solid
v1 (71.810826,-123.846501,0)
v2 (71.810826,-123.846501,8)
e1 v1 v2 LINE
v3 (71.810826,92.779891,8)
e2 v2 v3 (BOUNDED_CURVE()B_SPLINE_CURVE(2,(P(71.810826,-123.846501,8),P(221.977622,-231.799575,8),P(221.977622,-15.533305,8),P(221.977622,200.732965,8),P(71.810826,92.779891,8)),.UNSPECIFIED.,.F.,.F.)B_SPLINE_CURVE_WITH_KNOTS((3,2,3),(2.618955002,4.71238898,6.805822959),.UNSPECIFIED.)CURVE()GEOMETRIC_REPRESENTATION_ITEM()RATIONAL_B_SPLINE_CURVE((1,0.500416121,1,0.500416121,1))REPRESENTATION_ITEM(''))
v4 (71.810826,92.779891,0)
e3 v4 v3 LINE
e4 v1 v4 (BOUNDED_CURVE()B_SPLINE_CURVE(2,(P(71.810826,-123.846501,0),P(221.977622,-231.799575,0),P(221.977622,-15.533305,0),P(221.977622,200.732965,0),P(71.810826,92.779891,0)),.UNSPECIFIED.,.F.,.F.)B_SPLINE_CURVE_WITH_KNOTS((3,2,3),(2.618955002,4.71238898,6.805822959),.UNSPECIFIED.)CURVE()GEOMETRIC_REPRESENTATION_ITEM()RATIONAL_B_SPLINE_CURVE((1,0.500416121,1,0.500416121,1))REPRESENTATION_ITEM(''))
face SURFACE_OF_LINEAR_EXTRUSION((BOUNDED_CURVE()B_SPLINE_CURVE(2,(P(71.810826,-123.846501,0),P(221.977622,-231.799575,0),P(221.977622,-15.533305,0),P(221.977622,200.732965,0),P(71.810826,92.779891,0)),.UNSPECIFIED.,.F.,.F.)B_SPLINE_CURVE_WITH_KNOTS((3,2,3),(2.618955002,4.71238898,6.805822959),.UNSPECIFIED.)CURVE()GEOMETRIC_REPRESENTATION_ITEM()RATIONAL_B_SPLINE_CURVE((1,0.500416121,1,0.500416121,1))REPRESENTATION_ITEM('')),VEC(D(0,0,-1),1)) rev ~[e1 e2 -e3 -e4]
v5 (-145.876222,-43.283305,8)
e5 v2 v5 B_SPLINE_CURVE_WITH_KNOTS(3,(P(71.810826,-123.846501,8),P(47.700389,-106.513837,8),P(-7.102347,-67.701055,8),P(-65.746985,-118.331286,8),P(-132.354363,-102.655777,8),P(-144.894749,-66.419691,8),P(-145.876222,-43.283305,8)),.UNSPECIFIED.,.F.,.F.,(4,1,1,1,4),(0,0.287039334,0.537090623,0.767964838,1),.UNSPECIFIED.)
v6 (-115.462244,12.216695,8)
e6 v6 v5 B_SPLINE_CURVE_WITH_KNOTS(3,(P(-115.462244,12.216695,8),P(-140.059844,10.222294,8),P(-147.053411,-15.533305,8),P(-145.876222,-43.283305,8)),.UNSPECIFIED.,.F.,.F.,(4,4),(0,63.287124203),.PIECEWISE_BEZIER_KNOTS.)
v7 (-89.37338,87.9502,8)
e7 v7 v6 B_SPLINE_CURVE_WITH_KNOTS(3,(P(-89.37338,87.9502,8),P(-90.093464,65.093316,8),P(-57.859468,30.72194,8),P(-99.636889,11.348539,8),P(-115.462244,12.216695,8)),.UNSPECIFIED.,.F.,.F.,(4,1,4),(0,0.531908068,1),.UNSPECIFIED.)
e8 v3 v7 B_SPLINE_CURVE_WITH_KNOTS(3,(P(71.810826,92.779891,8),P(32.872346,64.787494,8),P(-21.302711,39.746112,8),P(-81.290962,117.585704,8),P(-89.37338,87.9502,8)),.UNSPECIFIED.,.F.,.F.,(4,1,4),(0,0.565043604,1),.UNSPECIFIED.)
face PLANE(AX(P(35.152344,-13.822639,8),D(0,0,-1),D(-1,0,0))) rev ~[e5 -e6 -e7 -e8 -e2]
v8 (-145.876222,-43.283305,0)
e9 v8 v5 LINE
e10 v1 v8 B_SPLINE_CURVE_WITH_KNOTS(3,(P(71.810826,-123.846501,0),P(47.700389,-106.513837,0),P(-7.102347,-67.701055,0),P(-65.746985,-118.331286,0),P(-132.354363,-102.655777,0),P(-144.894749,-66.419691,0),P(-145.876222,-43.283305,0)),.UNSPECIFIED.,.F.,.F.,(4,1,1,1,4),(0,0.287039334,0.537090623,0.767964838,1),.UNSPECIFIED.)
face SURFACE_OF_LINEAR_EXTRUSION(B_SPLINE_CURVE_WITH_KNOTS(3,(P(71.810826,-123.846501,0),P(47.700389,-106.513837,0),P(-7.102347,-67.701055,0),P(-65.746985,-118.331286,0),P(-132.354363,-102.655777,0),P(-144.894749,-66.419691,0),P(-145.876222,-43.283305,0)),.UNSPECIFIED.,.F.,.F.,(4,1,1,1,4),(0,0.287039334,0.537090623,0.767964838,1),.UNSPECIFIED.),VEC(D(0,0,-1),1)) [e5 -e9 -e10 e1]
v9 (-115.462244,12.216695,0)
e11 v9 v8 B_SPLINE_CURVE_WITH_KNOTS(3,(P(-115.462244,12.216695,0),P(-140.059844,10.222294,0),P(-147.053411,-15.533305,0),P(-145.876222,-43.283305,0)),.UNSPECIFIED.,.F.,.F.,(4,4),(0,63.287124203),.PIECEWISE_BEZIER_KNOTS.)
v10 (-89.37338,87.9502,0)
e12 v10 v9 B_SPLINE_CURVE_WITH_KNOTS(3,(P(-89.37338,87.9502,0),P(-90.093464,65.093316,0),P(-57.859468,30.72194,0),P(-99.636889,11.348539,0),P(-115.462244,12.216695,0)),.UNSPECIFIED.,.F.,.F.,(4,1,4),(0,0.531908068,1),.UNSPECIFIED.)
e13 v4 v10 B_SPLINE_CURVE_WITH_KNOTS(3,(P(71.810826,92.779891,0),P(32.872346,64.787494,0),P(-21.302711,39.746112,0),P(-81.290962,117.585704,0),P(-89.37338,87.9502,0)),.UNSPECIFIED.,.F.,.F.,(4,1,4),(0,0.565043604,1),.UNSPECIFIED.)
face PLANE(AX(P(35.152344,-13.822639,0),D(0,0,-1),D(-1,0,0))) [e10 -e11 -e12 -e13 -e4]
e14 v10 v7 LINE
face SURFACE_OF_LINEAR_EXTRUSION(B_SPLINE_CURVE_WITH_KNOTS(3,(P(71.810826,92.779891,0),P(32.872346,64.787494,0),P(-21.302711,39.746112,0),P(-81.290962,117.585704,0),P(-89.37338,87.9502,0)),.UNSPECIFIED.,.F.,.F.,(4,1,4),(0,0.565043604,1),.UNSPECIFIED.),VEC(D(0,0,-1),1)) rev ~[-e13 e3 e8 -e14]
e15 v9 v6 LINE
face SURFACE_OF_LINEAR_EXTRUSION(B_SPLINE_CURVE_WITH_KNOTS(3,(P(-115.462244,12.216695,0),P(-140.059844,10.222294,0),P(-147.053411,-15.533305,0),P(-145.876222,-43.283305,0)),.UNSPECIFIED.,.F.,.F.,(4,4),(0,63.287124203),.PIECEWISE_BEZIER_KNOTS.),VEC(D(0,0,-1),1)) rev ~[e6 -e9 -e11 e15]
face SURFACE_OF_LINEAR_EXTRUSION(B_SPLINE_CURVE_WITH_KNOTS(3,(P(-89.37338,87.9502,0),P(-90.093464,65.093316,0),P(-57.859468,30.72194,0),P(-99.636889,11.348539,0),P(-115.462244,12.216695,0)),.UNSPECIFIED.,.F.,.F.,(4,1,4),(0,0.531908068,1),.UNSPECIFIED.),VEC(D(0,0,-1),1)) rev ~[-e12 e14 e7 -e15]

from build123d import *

# Parameters (mm, degrees)
F1_DEPTH = 8


with BuildPart() as f1:
    # F0 (on Top) → F1 (new body)
    with BuildSketch(Plane.XY):
        with BuildLine():
            add(Edge.make_bspline(
                [(71.8108263604, -123.8465007597), (47.7003894889, -106.5138372126), (-7.1023466925, -67.7010548051), (-65.7469849132, -118.3312863438), (-132.354363187, -102.6557773389), (-144.8947489305, -66.4196911039), (-145.8762223824, -43.2833050614)],
                knots=[0, 0, 0, 0, 0.2870393338, 0.537090623, 0.7679648384, 1, 1, 1, 1], degree=3))
            add(Edge.make_bspline(
                [(71.8108263604, -123.8465007597), (221.9776217834, -231.7995748847), (221.9776217834, -15.5333050614), (221.9776217834, 200.732964762), (71.8108263604, 92.7798906369)],
                knots=[2.6189550017, 2.6189550017, 2.6189550017, 4.7123889804, 4.7123889804, 6.805822959, 6.805822959, 6.805822959], degree=2, weights=[1, 0.500416121, 1, 0.500416121, 1]))
            add(Edge.make_bspline(
                [(71.8108263604, 92.7798906369), (32.8723456502, 64.787494425), (-21.3027110814, 39.7461116108), (-81.2909620858, 117.5857035406), (-89.3733802445, 87.9502004857)],
                knots=[0, 0, 0, 0, 0.5650436037, 1, 1, 1, 1], degree=3))
            add(Edge.make_bspline(
                [(-89.3733802445, 87.9502004857), (-90.0934642677, 65.0933156509), (-57.859468156, 30.7219399995), (-99.6368888097, 11.3485391097), (-115.4622438558, 12.2166949386)],
                knots=[0, 0, 0, 0, 0.5319080677, 1, 1, 1, 1], degree=3))
            add(Edge.make_bspline(
                [(-115.4622438558, 12.2166949386), (-140.0598439582, 10.2222937221), (-147.0534109131, -15.5333050614), (-145.8762223824, -43.2833050614)],
                knots=[0, 0, 0, 0, 63.2871242025, 63.2871242025, 63.2871242025, 63.2871242025], degree=3))
        make_face()
        with BuildLine():
            add(Edge.make_bspline(
                [(-81.4262804577, 86.6857544237), (-81.4396250825, 86.2899525598), (-81.470808458, 84.4412359429), (-81.2371444329, 80.3732443352), (-79.8996394846, 74.5622458053), (-77.7739796116, 68.1004270996), (-75.1889101521, 61.6875748493), (-72.6363769897, 55.6379909817), (-70.5528201855, 50.214885946), (-69.2861786808, 45.7296293686), (-68.4936431345, 42.0817923462), (-68.1698884875, 39.0929607397), (-68.1533657536, 36.6406286998), (-68.2570236145, 34.6616403838), (-68.4737574041, 33.0838263382), (-68.7291671623, 31.8176398216), (-68.9833432916, 30.7603115144), (-69.2894446793, 29.7143907955), (-69.7010474162, 28.4802252803), (-70.3057430461, 26.9847588782), (-71.2217272744, 25.180071771), (-72.5057098447, 22.996441344), (-74.3801649871, 20.4643430051), (-77.1315209855, 17.5971889856), (-80.926011463, 14.2754710831), (-86.2805957531, 10.7907129486), (-92.9455256658, 7.7447804381), (-100.4062506896, 5.4313702506), (-107.2615908321, 4.1555616419), (-112.3230611682, 4.0215517798), (-114.7617028131, 4.1430335828), (-115.474366372, 4.1953856873)],
                knots=[1.0136586156, 1.0136586156, 1.0136586156, 1.0136586156, 2.2016566853, 6.5591151943, 13.1979354067, 20.0157728224, 26.9584341349, 33.9306395999, 39.7192874549, 44.3702545919, 47.8991910145, 50.9066466506, 53.369227998, 55.2496065506, 56.847005284, 58.1419089398, 59.1235009163, 60.1084144557, 61.4103265818, 63.0253022922, 64.9424016715, 67.4766146145, 70.6177002822, 74.3676557464, 79.3769786716, 85.7174213089, 93.458168517, 101.2822181349, 109.1089736004, 114.2877981192, 116.4315649936, 116.4315649936, 116.4315649936, 116.4315649936], degree=3))
            add(Edge.make_bspline(
                [(72.8103885596, 83.6341241639), (71.1240314332, 82.4184487748), (65.3211296449, 78.2511465746), (54.3822197437, 70.6703789871), (40.5843185437, 63.3369671226), (27.1044447549, 57.4124251533), (15.6068408566, 53.964757392), (5.3548644478, 52.6151050201), (-2.8177310259, 52.7103819348), (-9.6197612713, 53.363557714), (-15.7305931996, 54.5996218363), (-21.4732164128, 56.31783797), (-26.4693776174, 58.366991406), (-30.2671336771, 60.2223905595), (-33.0718752326, 61.7320886712), (-35.2053892899, 62.9792168629), (-37.3369452365, 64.2673631998), (-39.7615979324, 65.8275673276), (-42.7778265582, 67.9000785118), (-46.5332653234, 70.5849117526), (-51.0723794993, 74.0383260586), (-56.0224963865, 77.9290754702), (-61.0223620617, 81.8442891195), (-65.7064727807, 85.3502794992), (-69.7594173643, 88.139955985), (-72.9865417062, 89.9814861225), (-75.2118467434, 90.9665662194), (-76.6921868128, 91.4830508838), (-77.6909621365, 91.7169743843), (-78.3366022017, 91.7578979554), (-78.6767300882, 91.7470455298), (-78.7973913091, 91.6896137336), (-78.92482237, 91.6464959623), (-79.1937851984, 91.3963059685), (-79.6818827943, 90.8264140362), (-80.3159105632, 89.7215409417), (-80.9369473577, 88.2993059967), (-81.2772034526, 87.2085598356), (-81.4244737614, 86.692097536), (-81.4262804577, 86.6857544237)],
                knots=[4.5292135135, 4.5292135135, 4.5292135135, 4.5292135135, 10.7658667308, 25.9500108525, 44.4238690912, 57.5330245622, 70.0845168555, 80.2898579631, 88.4222588801, 94.5557392843, 100.7652771107, 107.0947805516, 112.5088206902, 116.9457400715, 119.7701488038, 122.0625237383, 124.3588459686, 127.2414612751, 130.7107153436, 135.3368293125, 141.0894801607, 147.8190536406, 154.2256313175, 160.1398760262, 165.3706560057, 168.9759235223, 171.2693919986, 172.6578901032, 173.6814113013, 174.3231622883, 174.6136969662, 174.6729508701, 174.7225491593, 175.0159838788, 175.7405361192, 176.9913533667, 178.804034025, 180.3944536329, 180.4142282457, 180.4142282457, 180.4142282457, 180.4142282457], degree=3))
            add(Edge.make_bspline(
                [(72.8103885596, 83.6341241639), (72.7317618823, 83.5699644288), (70.9554937476, 82.1155753179), (67.9804833382, 79.4874285922), (64.1756082657, 75.8169878196), (61.2913248025, 72.7059934358), (59.0477069928, 70.0999739159), (57.2057633336, 67.8641883266), (55.4110672881, 65.56108087), (53.3041635287, 62.7354150513), (50.7805389552, 59.0881516023), (47.799656336, 54.2715974255), (44.2346711733, 47.9787195772), (40.2649118491, 39.7160179142), (36.5713092348, 29.8478370438), (33.5979528322, 19.5919068023), (31.7307948184, 10.2422116085), (30.6840668384, 2.616404127), (30.0568619889, -3.4886245577), (29.7723767309, -8.3519176651), (29.6597520537, -12.2635801323), (29.6233030189, -15.5333050614), (29.6597520537, -18.8030299904), (29.7723767309, -22.7146924576), (30.0568619889, -27.577985565), (30.6840668384, -33.6830142497), (31.7307948184, -41.3088217312), (33.5979528322, -50.658516925), (36.5713092348, -60.9144471666), (40.2649118491, -70.7826280369), (44.2346711733, -79.0453296999), (47.799656336, -85.3382075482), (50.7805389552, -90.154761725), (53.3041635287, -93.802025174), (55.4110672881, -96.6276909927), (57.2057633336, -98.9307984493), (59.0477069928, -101.1665840385), (61.2913248025, -103.7726035588), (64.1756082657, -106.8835979408), (67.9804833382, -110.5540387225), (71.0158561736, -113.2355100421), (72.8564442573, -114.7385263129), (72.9977731483, -114.8532271387)],
                knots=[55.4205486123, 55.4205486123, 55.4205486123, 55.4205486123, 55.7249011544, 62.305727762, 67.3238088056, 71.5787205888, 75.0272954709, 77.639141403, 80.2683237903, 83.7858930003, 88.2122067644, 93.5690542346, 100.7734603115, 109.9018351329, 121.0375002369, 132.3448319226, 141.8998601689, 149.6118137579, 155.4302714584, 160.3068693677, 164.2227012809, 167.1693695094, 170.1160377378, 174.0318696511, 178.9084675603, 184.7269252608, 192.4388788498, 201.9939070962, 213.3012387819, 224.4369038858, 233.5652787073, 240.7696847841, 246.1265322543, 250.5528460185, 254.0704152284, 256.6995976157, 259.3114435479, 262.76001843, 267.0149302132, 272.0330112567, 278.6138378644, 279.1597054143, 279.1597054143, 279.1597054143, 279.1597054143], degree=3))
            add(Edge.make_bspline(
                [(72.9977731483, -114.8532271387), (72.4056865049, -114.4263580428), (69.0464376439, -111.9992044047), (61.9105909681, -106.8036530478), (52.1940425374, -100.414675291), (42.2398177459, -94.2326232769), (33.0541391905, -89.1692992659), (24.2243642947, -84.9672989241), (16.2683766941, -82.0032951161), (9.8318873834, -80.2250290854), (4.463169856, -79.0636225581), (-0.1263073791, -78.4111921814), (-4.1937519975, -78.1649162686), (-7.7060356334, -78.20526396), (-11.1805991563, -78.3727848605), (-15.105690951, -78.8390498977), (-19.429069468, -79.71105596), (-23.8718019577, -80.9066029792), (-28.6468717479, -82.5067792162), (-34.2116599911, -84.6249302975), (-40.8658871469, -87.6398905134), (-47.690965404, -91.0045722285), (-53.9322172369, -94.031755035), (-58.8517886529, -96.1862154004), (-62.8636912858, -97.8099974599), (-66.2287548358, -99.0112055596), (-69.174479199, -99.8882996602), (-71.7101157046, -100.5041409348), (-74.2391141536, -101.045908585), (-77.1889902033, -101.5211815466), (-80.5636006609, -101.8380782168), (-84.1498166568, -101.9648655282), (-88.1283425241, -101.8479910003), (-92.8713789939, -101.4573804411), (-98.6786686768, -100.4434986326), (-104.6143126843, -98.6675537845), (-109.8122869472, -96.3889800651), (-113.6612373405, -94.2262164294), (-116.6721363111, -92.2928397642), (-119.445929644, -90.1897015323), (-122.5417365002, -87.5069010735), (-126.0053703089, -83.7372187502), (-129.3000799141, -78.8269050802), (-132.2206720517, -72.9997696435), (-134.760402105, -65.6917432119), (-136.8528161109, -57.6024378465), (-137.649866694, -49.6245863229), (-137.8414579174, -44.9060106494), (-137.8834109174, -42.9442403412)],
                knots=[4.2858061399, 4.2858061399, 4.2858061399, 4.2858061399, 6.4754935696, 16.7181495974, 30.7634466026, 41.3498570357, 51.8646712584, 62.2141493558, 70.6575747754, 77.2977144197, 82.2304258348, 87.1280777725, 91.1888826436, 94.4417008039, 97.6615312024, 101.6210664508, 106.2864985952, 110.880412158, 115.4145221345, 121.3894131446, 128.7352744437, 137.3194350468, 144.219174491, 149.5422059689, 153.4280250406, 157.2015215054, 160.2566826573, 162.6437031168, 165.0279610064, 168.0144585226, 171.6015387383, 175.1893400883, 178.772742133, 183.5366693447, 189.4556710281, 196.4255332119, 202.067982696, 206.4456583082, 209.6586104968, 212.7949457303, 216.8805616296, 221.934808933, 228.1024059287, 234.5573044306, 241.4332004742, 251.2825478576, 259.5402388761, 265.4359196068, 265.4359196068, 265.4359196068, 265.4359196068], degree=3))
            add(Edge.make_bspline(
                [(-115.474366372, 4.1953856873), (-115.654699102, 4.1804409153), (-116.5836359717, 4.0950636678), (-118.5079216061, 3.8241612148), (-121.094735833, 3.0439396902), (-123.6838235375, 1.8597581111), (-125.9853889989, 0.3481336416), (-128.0619952594, -1.4951736511), (-129.9535460087, -3.6932073495), (-131.8514714309, -6.5803447016), (-133.9637161202, -10.6180046655), (-136.0486166412, -16.5975276115), (-137.4710871628, -24.3656867863), (-138.1549681717, -32.3234699475), (-138.079170547, -38.6118374717), (-137.939859331, -41.8534729549), (-137.8834109174, -42.9442403412)],
                knots=[0.6605528161, 0.6605528161, 0.6605528161, 0.6605528161, 1.2032828879, 3.4574616871, 6.4791602651, 9.2718264149, 11.9726703823, 14.7076610425, 17.5762809491, 20.6455316793, 25.0544251668, 31.2157003257, 39.5600454386, 48.6812593878, 55.1351477368, 58.4131045259, 58.4131045259, 58.4131045259, 58.4131045259], degree=3))
        make_face(mode=Mode.SUBTRACT)
        with BuildLine():
            add(Edge.make_bspline(
                [(72.8103885596, 83.6341241639), (71.1240314332, 82.4184487748), (65.3211296449, 78.2511465746), (54.3822197437, 70.6703789871), (40.5843185437, 63.3369671226), (27.1044447549, 57.4124251533), (15.6068408566, 53.964757392), (5.3548644478, 52.6151050201), (-2.8177310259, 52.7103819348), (-9.6197612713, 53.363557714), (-15.7305931996, 54.5996218363), (-21.4732164128, 56.31783797), (-26.4693776174, 58.366991406), (-30.2671336771, 60.2223905595), (-33.0718752326, 61.7320886712), (-35.2053892899, 62.9792168629), (-37.3369452365, 64.2673631998), (-39.7615979324, 65.8275673276), (-42.7778265582, 67.9000785118), (-46.5332653234, 70.5849117526), (-51.0723794993, 74.0383260586), (-56.0224963865, 77.9290754702), (-61.0223620617, 81.8442891195), (-65.7064727807, 85.3502794992), (-69.7594173643, 88.139955985), (-72.9865417062, 89.9814861225), (-75.2118467434, 90.9665662194), (-76.6921868128, 91.4830508838), (-77.6909621365, 91.7169743843), (-78.3366022017, 91.7578979554), (-78.6767300882, 91.7470455298), (-78.7973913091, 91.6896137336), (-78.92482237, 91.6464959623), (-79.1937851984, 91.3963059685), (-79.6818827943, 90.8264140362), (-80.3159105632, 89.7215409417), (-80.9369473577, 88.2993059967), (-81.2772034526, 87.2085598356), (-81.4244737614, 86.692097536), (-81.4262804577, 86.6857544237)],
                knots=[4.5292135135, 4.5292135135, 4.5292135135, 4.5292135135, 10.7658667308, 25.9500108525, 44.4238690912, 57.5330245622, 70.0845168555, 80.2898579631, 88.4222588801, 94.5557392843, 100.7652771107, 107.0947805516, 112.5088206902, 116.9457400715, 119.7701488038, 122.0625237383, 124.3588459686, 127.2414612751, 130.7107153436, 135.3368293125, 141.0894801607, 147.8190536406, 154.2256313175, 160.1398760262, 165.3706560057, 168.9759235223, 171.2693919986, 172.6578901032, 173.6814113013, 174.3231622883, 174.6136969662, 174.6729508701, 174.7225491593, 175.0159838788, 175.7405361192, 176.9913533667, 178.804034025, 180.3944536329, 180.4142282457, 180.4142282457, 180.4142282457, 180.4142282457], degree=3))
            add(Edge.make_bspline(
                [(-81.4262804577, 86.6857544237), (-81.4396250825, 86.2899525598), (-81.470808458, 84.4412359429), (-81.2371444329, 80.3732443352), (-79.8996394846, 74.5622458053), (-77.7739796116, 68.1004270996), (-75.1889101521, 61.6875748493), (-72.6363769897, 55.6379909817), (-70.5528201855, 50.214885946), (-69.2861786808, 45.7296293686), (-68.4936431345, 42.0817923462), (-68.1698884875, 39.0929607397), (-68.1533657536, 36.6406286998), (-68.2570236145, 34.6616403838), (-68.4737574041, 33.0838263382), (-68.7291671623, 31.8176398216), (-68.9833432916, 30.7603115144), (-69.2894446793, 29.7143907955), (-69.7010474162, 28.4802252803), (-70.3057430461, 26.9847588782), (-71.2217272744, 25.180071771), (-72.5057098447, 22.996441344), (-74.3801649871, 20.4643430051), (-77.1315209855, 17.5971889856), (-80.926011463, 14.2754710831), (-86.2805957531, 10.7907129486), (-92.9455256658, 7.7447804381), (-100.4062506896, 5.4313702506), (-107.2615908321, 4.1555616419), (-112.3230611682, 4.0215517798), (-114.7617028131, 4.1430335828), (-115.474366372, 4.1953856873)],
                knots=[1.0136586156, 1.0136586156, 1.0136586156, 1.0136586156, 2.2016566853, 6.5591151943, 13.1979354067, 20.0157728224, 26.9584341349, 33.9306395999, 39.7192874549, 44.3702545919, 47.8991910145, 50.9066466506, 53.369227998, 55.2496065506, 56.847005284, 58.1419089398, 59.1235009163, 60.1084144557, 61.4103265818, 63.0253022922, 64.9424016715, 67.4766146145, 70.6177002822, 74.3676557464, 79.3769786716, 85.7174213089, 93.458168517, 101.2822181349, 109.1089736004, 114.2877981192, 116.4315649936, 116.4315649936, 116.4315649936, 116.4315649936], degree=3))
            add(Edge.make_bspline(
                [(-115.474366372, 4.1953856873), (-115.654699102, 4.1804409153), (-116.5836359717, 4.0950636678), (-118.5079216061, 3.8241612148), (-121.094735833, 3.0439396902), (-123.6838235375, 1.8597581111), (-125.9853889989, 0.3481336416), (-128.0619952594, -1.4951736511), (-129.9535460087, -3.6932073495), (-131.8514714309, -6.5803447016), (-133.9637161202, -10.6180046655), (-136.0486166412, -16.5975276115), (-137.4710871628, -24.3656867863), (-138.1549681717, -32.3234699475), (-138.079170547, -38.6118374717), (-137.939859331, -41.8534729549), (-137.8834109174, -42.9442403412)],
                knots=[0.6605528161, 0.6605528161, 0.6605528161, 0.6605528161, 1.2032828879, 3.4574616871, 6.4791602651, 9.2718264149, 11.9726703823, 14.7076610425, 17.5762809491, 20.6455316793, 25.0544251668, 31.2157003257, 39.5600454386, 48.6812593878, 55.1351477368, 58.4131045259, 58.4131045259, 58.4131045259, 58.4131045259], degree=3))
            add(Edge.make_bspline(
                [(72.9977731483, -114.8532271387), (72.4056865049, -114.4263580428), (69.0464376439, -111.9992044047), (61.9105909681, -106.8036530478), (52.1940425374, -100.414675291), (42.2398177459, -94.2326232769), (33.0541391905, -89.1692992659), (24.2243642947, -84.9672989241), (16.2683766941, -82.0032951161), (9.8318873834, -80.2250290854), (4.463169856, -79.0636225581), (-0.1263073791, -78.4111921814), (-4.1937519975, -78.1649162686), (-7.7060356334, -78.20526396), (-11.1805991563, -78.3727848605), (-15.105690951, -78.8390498977), (-19.429069468, -79.71105596), (-23.8718019577, -80.9066029792), (-28.6468717479, -82.5067792162), (-34.2116599911, -84.6249302975), (-40.8658871469, -87.6398905134), (-47.690965404, -91.0045722285), (-53.9322172369, -94.031755035), (-58.8517886529, -96.1862154004), (-62.8636912858, -97.8099974599), (-66.2287548358, -99.0112055596), (-69.174479199, -99.8882996602), (-71.7101157046, -100.5041409348), (-74.2391141536, -101.045908585), (-77.1889902033, -101.5211815466), (-80.5636006609, -101.8380782168), (-84.1498166568, -101.9648655282), (-88.1283425241, -101.8479910003), (-92.8713789939, -101.4573804411), (-98.6786686768, -100.4434986326), (-104.6143126843, -98.6675537845), (-109.8122869472, -96.3889800651), (-113.6612373405, -94.2262164294), (-116.6721363111, -92.2928397642), (-119.445929644, -90.1897015323), (-122.5417365002, -87.5069010735), (-126.0053703089, -83.7372187502), (-129.3000799141, -78.8269050802), (-132.2206720517, -72.9997696435), (-134.760402105, -65.6917432119), (-136.8528161109, -57.6024378465), (-137.649866694, -49.6245863229), (-137.8414579174, -44.9060106494), (-137.8834109174, -42.9442403412)],
                knots=[4.2858061399, 4.2858061399, 4.2858061399, 4.2858061399, 6.4754935696, 16.7181495974, 30.7634466026, 41.3498570357, 51.8646712584, 62.2141493558, 70.6575747754, 77.2977144197, 82.2304258348, 87.1280777725, 91.1888826436, 94.4417008039, 97.6615312024, 101.6210664508, 106.2864985952, 110.880412158, 115.4145221345, 121.3894131446, 128.7352744437, 137.3194350468, 144.219174491, 149.5422059689, 153.4280250406, 157.2015215054, 160.2566826573, 162.6437031168, 165.0279610064, 168.0144585226, 171.6015387383, 175.1893400883, 178.772742133, 183.5366693447, 189.4556710281, 196.4255332119, 202.067982696, 206.4456583082, 209.6586104968, 212.7949457303, 216.8805616296, 221.934808933, 228.1024059287, 234.5573044306, 241.4332004742, 251.2825478576, 259.5402388761, 265.4359196068, 265.4359196068, 265.4359196068, 265.4359196068], degree=3))
            add(Edge.make_bspline(
                [(72.8103885596, 83.6341241639), (72.7317618823, 83.5699644288), (70.9554937476, 82.1155753179), (67.9804833382, 79.4874285922), (64.1756082657, 75.8169878196), (61.2913248025, 72.7059934358), (59.0477069928, 70.0999739159), (57.2057633336, 67.8641883266), (55.4110672881, 65.56108087), (53.3041635287, 62.7354150513), (50.7805389552, 59.0881516023), (47.799656336, 54.2715974255), (44.2346711733, 47.9787195772), (40.2649118491, 39.7160179142), (36.5713092348, 29.8478370438), (33.5979528322, 19.5919068023), (31.7307948184, 10.2422116085), (30.6840668384, 2.616404127), (30.0568619889, -3.4886245577), (29.7723767309, -8.3519176651), (29.6597520537, -12.2635801323), (29.6233030189, -15.5333050614), (29.6597520537, -18.8030299904), (29.7723767309, -22.7146924576), (30.0568619889, -27.577985565), (30.6840668384, -33.6830142497), (31.7307948184, -41.3088217312), (33.5979528322, -50.658516925), (36.5713092348, -60.9144471666), (40.2649118491, -70.7826280369), (44.2346711733, -79.0453296999), (47.799656336, -85.3382075482), (50.7805389552, -90.154761725), (53.3041635287, -93.802025174), (55.4110672881, -96.6276909927), (57.2057633336, -98.9307984493), (59.0477069928, -101.1665840385), (61.2913248025, -103.7726035588), (64.1756082657, -106.8835979408), (67.9804833382, -110.5540387225), (71.0158561736, -113.2355100421), (72.8564442573, -114.7385263129), (72.9977731483, -114.8532271387)],
                knots=[55.4205486123, 55.4205486123, 55.4205486123, 55.4205486123, 55.7249011544, 62.305727762, 67.3238088056, 71.5787205888, 75.0272954709, 77.639141403, 80.2683237903, 83.7858930003, 88.2122067644, 93.5690542346, 100.7734603115, 109.9018351329, 121.0375002369, 132.3448319226, 141.8998601689, 149.6118137579, 155.4302714584, 160.3068693677, 164.2227012809, 167.1693695094, 170.1160377378, 174.0318696511, 178.9084675603, 184.7269252608, 192.4388788498, 201.9939070962, 213.3012387819, 224.4369038858, 233.5652787073, 240.7696847841, 246.1265322543, 250.5528460185, 254.0704152284, 256.6995976157, 259.3114435479, 262.76001843, 267.0149302132, 272.0330112567, 278.6138378644, 279.1597054143, 279.1597054143, 279.1597054143, 279.1597054143], degree=3))
        make_face()
    extrude(amount=F1_DEPTH)


solid = f1.part
